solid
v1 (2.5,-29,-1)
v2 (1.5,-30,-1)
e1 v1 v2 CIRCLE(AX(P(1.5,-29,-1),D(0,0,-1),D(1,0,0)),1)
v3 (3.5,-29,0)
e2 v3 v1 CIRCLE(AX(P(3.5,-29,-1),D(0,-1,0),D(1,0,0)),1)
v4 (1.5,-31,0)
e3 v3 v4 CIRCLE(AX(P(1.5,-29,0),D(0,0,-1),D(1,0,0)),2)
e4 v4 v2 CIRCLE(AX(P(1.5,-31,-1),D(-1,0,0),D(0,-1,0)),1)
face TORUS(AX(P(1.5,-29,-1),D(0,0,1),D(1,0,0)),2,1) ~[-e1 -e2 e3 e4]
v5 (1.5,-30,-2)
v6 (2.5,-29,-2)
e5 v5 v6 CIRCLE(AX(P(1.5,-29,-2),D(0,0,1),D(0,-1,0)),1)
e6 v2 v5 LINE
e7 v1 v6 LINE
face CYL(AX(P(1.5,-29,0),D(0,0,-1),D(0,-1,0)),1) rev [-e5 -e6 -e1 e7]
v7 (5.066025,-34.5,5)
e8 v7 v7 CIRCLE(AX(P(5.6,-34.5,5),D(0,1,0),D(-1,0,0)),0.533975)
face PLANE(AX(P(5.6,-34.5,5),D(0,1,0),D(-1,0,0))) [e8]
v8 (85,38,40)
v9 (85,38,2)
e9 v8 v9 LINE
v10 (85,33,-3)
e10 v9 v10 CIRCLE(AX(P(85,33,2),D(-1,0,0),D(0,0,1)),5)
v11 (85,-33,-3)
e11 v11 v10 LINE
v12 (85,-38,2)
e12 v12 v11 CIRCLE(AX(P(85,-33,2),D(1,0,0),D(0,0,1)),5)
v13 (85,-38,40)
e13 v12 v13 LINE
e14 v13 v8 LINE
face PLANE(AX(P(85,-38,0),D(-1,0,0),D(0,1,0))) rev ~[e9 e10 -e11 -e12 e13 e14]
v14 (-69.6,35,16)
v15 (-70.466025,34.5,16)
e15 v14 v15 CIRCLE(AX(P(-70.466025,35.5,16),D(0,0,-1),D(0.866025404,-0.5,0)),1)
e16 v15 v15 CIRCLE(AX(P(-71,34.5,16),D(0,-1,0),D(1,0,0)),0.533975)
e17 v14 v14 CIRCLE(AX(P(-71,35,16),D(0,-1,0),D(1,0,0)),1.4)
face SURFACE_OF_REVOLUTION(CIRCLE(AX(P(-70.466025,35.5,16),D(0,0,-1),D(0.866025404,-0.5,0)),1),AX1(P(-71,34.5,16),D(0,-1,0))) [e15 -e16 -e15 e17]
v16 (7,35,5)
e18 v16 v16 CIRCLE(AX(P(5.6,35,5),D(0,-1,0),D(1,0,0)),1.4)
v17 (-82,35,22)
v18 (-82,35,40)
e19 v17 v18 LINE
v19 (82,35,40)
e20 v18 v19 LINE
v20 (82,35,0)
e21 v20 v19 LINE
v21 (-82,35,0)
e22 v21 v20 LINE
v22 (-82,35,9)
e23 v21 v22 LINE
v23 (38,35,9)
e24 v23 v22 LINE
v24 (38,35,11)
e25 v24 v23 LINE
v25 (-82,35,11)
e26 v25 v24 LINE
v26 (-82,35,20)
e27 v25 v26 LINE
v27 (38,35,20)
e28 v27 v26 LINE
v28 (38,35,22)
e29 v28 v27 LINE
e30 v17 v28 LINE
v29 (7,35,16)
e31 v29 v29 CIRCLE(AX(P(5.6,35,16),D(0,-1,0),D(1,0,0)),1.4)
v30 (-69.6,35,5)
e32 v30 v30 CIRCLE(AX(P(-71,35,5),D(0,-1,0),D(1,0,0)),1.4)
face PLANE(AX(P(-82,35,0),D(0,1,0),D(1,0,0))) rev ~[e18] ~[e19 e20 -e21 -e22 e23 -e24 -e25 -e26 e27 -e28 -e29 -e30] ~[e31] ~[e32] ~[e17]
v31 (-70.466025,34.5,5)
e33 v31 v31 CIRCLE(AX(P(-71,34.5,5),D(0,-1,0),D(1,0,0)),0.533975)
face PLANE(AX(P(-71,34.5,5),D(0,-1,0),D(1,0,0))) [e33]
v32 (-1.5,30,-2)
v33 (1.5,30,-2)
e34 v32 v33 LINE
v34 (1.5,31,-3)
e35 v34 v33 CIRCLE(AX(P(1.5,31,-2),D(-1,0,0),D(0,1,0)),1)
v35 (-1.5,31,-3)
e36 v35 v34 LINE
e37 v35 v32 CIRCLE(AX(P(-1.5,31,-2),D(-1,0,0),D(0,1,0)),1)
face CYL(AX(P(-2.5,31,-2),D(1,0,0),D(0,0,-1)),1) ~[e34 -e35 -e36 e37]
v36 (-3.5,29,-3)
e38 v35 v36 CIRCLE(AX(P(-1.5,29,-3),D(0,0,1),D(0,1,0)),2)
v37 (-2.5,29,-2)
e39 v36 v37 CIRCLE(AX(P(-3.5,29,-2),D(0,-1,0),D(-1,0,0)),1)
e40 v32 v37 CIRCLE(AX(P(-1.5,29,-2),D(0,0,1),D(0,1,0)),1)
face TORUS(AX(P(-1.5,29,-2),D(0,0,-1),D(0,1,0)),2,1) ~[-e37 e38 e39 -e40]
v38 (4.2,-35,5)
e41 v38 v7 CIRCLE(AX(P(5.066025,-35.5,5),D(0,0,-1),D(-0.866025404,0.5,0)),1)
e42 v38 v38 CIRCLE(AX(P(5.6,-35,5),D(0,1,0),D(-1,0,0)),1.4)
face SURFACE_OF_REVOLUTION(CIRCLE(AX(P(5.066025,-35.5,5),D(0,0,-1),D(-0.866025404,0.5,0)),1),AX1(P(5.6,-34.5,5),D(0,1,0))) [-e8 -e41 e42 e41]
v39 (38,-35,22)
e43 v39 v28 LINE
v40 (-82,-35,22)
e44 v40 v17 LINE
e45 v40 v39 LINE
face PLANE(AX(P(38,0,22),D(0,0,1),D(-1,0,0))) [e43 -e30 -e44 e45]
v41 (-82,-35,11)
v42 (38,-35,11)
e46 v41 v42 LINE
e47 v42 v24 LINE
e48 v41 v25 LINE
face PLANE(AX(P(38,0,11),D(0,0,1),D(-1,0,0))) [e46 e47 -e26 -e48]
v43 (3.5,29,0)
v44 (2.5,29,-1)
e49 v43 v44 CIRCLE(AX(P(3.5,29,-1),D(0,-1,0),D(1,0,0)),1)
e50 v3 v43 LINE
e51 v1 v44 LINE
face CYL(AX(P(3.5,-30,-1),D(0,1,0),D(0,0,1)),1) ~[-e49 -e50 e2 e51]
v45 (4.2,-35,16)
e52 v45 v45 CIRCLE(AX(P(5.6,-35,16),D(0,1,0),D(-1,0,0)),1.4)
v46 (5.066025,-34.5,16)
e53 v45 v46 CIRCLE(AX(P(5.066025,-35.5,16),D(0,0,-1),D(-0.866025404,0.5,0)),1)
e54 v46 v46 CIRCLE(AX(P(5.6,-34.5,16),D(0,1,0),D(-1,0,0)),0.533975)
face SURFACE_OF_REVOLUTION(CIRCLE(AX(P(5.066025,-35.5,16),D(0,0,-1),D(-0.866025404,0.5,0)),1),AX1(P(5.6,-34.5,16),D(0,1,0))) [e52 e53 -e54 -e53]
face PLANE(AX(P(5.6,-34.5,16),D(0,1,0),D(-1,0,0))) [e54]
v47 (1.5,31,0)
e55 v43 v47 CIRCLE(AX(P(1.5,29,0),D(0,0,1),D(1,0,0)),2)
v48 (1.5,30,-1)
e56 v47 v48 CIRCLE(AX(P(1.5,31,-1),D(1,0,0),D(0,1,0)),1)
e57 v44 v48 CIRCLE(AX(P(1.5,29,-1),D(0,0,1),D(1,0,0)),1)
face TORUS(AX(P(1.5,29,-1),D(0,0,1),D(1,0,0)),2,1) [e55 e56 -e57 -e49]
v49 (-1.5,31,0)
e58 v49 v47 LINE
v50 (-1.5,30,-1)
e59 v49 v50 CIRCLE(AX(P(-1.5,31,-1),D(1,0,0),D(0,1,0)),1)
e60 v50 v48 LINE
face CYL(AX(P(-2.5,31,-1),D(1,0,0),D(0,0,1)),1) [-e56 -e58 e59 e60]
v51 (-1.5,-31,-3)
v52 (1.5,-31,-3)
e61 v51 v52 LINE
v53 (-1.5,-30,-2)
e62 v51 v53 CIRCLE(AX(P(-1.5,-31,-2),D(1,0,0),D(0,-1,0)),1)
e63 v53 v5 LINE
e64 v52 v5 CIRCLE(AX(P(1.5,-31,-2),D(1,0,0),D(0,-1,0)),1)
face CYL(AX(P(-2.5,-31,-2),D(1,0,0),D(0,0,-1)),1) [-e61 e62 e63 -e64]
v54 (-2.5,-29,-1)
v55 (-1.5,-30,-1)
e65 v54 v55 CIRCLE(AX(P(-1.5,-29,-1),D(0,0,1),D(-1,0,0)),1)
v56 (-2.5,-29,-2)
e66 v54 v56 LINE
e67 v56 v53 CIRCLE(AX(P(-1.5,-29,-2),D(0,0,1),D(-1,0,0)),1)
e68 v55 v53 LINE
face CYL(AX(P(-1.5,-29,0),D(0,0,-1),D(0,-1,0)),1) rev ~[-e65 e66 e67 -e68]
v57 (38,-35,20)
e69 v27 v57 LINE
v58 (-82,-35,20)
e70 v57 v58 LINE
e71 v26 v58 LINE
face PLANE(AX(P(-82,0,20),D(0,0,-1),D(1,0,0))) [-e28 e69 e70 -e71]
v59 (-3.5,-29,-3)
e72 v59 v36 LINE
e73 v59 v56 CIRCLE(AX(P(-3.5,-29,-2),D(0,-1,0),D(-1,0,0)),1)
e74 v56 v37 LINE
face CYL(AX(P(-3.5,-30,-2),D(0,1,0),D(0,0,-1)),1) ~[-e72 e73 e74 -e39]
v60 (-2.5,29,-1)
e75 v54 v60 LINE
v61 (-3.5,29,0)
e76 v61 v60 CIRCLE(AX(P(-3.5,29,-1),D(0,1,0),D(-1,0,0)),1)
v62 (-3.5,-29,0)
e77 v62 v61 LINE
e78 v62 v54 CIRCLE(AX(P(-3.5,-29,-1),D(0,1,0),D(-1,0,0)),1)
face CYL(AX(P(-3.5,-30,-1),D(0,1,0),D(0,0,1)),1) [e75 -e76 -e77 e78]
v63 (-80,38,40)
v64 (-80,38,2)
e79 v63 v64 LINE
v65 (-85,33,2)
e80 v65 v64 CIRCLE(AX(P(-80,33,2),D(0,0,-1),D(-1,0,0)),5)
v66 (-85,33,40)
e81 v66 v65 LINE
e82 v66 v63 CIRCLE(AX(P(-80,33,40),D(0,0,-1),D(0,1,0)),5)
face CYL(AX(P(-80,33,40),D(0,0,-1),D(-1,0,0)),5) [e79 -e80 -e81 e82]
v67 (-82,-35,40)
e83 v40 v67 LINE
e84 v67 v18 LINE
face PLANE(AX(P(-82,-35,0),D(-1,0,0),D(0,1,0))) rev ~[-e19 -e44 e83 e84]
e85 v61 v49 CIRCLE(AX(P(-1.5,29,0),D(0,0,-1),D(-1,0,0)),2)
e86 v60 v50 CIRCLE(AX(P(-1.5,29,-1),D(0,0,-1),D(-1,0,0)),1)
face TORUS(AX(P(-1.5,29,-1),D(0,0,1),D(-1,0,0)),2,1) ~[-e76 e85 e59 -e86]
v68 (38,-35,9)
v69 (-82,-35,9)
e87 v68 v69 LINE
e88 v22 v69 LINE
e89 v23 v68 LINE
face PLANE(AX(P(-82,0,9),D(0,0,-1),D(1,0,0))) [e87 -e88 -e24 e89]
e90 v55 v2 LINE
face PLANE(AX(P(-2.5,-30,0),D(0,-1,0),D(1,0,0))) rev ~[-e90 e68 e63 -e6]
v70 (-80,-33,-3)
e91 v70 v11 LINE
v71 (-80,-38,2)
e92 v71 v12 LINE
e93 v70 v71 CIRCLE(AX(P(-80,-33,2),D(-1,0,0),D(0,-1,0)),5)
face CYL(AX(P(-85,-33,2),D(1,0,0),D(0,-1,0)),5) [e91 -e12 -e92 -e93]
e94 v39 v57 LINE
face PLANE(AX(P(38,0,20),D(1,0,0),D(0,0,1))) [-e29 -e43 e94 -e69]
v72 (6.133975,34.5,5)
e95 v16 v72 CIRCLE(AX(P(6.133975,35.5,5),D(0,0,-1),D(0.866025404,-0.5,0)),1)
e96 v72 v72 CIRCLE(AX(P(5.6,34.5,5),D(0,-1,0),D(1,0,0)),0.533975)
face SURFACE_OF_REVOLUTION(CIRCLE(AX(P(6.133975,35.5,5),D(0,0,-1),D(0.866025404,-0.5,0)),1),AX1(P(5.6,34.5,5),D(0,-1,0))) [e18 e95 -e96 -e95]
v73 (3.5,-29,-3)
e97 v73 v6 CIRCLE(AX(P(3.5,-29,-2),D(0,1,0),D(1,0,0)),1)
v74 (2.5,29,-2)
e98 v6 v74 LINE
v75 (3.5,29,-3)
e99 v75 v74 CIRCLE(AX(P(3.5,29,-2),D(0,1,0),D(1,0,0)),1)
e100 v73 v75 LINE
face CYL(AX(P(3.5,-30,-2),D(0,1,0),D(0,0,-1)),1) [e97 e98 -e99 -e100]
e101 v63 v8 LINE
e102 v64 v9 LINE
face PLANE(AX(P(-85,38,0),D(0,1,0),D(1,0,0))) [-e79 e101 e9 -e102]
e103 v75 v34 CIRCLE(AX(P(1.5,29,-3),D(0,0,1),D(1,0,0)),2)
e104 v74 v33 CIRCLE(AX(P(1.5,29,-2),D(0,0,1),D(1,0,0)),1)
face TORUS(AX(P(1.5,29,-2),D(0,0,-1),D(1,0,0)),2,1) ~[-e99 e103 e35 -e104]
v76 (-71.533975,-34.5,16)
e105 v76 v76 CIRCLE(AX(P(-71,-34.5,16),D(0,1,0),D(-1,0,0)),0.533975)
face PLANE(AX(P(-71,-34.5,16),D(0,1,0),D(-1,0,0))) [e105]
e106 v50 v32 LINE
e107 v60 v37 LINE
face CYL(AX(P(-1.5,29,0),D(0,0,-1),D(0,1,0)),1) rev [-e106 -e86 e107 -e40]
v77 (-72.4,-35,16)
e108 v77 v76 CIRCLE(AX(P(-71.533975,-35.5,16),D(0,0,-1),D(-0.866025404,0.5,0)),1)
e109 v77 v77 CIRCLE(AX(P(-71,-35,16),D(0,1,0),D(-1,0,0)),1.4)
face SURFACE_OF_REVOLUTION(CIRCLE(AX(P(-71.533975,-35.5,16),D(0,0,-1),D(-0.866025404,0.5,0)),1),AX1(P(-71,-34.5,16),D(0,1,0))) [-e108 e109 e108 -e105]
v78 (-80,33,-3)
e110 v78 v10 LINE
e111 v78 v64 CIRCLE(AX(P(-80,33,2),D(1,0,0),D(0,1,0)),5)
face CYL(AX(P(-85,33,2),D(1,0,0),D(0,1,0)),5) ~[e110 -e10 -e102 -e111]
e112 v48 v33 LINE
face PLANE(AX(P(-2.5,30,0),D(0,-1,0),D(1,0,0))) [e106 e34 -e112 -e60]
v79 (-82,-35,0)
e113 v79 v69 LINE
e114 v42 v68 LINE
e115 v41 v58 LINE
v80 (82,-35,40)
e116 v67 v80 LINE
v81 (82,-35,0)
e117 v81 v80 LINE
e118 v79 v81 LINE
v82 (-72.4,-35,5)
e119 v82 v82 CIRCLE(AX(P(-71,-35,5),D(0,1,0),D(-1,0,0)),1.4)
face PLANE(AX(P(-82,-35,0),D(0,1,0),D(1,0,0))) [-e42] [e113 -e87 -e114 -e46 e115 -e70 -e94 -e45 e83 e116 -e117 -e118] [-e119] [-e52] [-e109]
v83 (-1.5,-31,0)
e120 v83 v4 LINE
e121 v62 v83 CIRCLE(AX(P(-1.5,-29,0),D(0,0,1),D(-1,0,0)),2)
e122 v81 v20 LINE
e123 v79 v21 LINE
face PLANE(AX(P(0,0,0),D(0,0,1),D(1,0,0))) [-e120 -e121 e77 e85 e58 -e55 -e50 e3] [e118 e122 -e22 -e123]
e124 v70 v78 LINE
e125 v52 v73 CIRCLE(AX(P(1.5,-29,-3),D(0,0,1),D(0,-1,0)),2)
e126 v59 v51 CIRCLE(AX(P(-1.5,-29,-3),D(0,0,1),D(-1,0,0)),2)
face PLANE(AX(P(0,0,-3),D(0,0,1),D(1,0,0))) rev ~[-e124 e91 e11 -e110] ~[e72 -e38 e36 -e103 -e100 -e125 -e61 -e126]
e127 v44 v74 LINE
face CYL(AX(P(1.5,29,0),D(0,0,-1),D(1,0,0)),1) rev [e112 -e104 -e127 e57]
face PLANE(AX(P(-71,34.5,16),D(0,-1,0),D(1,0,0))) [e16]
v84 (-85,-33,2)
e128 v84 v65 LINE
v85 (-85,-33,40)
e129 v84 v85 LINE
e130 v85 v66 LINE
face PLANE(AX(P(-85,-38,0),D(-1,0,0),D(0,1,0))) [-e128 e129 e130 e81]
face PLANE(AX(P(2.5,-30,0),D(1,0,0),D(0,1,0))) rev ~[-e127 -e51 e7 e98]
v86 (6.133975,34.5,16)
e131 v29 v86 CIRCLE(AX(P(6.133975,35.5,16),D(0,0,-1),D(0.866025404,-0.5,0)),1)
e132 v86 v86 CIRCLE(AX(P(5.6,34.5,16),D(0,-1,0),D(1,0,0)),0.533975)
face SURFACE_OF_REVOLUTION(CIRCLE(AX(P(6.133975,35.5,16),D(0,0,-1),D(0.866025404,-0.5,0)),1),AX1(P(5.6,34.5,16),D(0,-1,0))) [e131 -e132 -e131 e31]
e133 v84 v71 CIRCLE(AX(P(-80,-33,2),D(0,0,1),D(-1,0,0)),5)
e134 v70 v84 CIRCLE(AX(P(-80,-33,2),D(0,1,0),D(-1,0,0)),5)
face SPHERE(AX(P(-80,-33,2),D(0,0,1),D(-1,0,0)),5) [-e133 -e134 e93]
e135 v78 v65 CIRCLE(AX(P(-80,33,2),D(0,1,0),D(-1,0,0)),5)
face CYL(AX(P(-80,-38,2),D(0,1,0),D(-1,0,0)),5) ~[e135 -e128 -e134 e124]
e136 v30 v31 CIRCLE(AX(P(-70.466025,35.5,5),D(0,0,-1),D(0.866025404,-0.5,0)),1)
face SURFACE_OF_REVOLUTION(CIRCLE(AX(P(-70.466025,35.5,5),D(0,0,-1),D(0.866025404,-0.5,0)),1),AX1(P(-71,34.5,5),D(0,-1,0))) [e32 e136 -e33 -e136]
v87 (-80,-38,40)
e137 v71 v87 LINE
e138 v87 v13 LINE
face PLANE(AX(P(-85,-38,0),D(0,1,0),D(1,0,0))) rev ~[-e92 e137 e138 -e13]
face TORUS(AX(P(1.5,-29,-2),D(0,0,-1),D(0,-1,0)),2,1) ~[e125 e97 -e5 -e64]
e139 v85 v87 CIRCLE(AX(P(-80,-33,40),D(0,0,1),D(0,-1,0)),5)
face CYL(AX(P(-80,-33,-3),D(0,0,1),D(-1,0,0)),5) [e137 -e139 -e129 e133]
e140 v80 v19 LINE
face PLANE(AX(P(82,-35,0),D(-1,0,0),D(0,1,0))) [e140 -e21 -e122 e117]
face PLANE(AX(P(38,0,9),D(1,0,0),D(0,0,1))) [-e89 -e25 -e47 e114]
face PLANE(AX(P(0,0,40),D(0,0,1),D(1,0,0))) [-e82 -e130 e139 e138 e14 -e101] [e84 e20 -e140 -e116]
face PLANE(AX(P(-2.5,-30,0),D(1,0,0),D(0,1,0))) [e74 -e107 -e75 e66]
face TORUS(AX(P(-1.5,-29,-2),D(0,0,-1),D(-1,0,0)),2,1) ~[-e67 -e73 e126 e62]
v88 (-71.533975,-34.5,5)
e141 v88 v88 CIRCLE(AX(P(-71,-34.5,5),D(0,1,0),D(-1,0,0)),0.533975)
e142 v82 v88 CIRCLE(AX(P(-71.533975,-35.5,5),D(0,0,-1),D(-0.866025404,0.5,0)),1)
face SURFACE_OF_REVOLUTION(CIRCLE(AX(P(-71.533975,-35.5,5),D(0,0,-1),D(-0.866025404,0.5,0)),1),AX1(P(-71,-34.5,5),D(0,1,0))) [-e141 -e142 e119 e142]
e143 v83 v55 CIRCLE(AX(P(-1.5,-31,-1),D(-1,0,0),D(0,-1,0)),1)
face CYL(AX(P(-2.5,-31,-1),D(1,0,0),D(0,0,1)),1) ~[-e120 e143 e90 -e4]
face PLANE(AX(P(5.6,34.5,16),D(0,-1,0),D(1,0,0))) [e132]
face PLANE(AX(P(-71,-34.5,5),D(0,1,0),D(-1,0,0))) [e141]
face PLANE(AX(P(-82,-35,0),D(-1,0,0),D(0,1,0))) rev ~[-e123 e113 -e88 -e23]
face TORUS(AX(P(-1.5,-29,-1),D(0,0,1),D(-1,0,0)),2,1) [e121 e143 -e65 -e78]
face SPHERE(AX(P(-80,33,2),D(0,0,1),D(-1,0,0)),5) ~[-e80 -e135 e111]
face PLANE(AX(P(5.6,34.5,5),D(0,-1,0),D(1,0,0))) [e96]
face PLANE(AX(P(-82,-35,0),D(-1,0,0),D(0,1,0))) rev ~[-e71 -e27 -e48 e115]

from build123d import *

# Parameters (mm, degrees)
F0_W      = 170
F0_H      = 76
F0_W_2    = 164
F0_H_2    = 70
F1_DEPTH  = 3
F2_DEPTH  = 40
F4_DEPTH  = 35.9
F5_DEPTH  = 36.4
F6_R      = 1.4
F7_DEPTH  = 0.5
F9_R      = 1.4
F10_DEPTH = 0.5
F12_R     = 5
F13_W     = 5
F13_H     = 60
F14_DEPTH = 5
F15_R     = 1


# Not quite as in the source:
# - a fillet or chamfer that OpenCascade refuses, or shapes differently, is made with other operations: its cross-section is extruded or revolved along the edge and cut away or added


with BuildPart() as f1:
    # F0 (on Top) → F1 (new body)
    with BuildSketch(Plane.XY):
        Rectangle(F0_W, F0_H)
        Rectangle(F0_W_2, F0_H_2, mode=Mode.SUBTRACT)
        Rectangle(F0_W_2, F0_H_2)
    extrude(amount=-F1_DEPTH)

    # F0 (on Top) → F2 (join)
    with BuildSketch(Plane.XY):
        Rectangle(F0_W, F0_H)
        Rectangle(F0_W_2, F0_H_2, mode=Mode.SUBTRACT)
    extrude(amount=F2_DEPTH)

    # F3 (on Front) → F4 (join, symmetric)
    with BuildSketch(Plane.XZ):
        Polygon((-82, 11), (-82, 9), (-71, 9), (0, 9), (5.6, 9), (38, 9), (38, 11), align=None)
    extrude(amount=F4_DEPTH, both=True)

    # F3 (on Front) → F5 (join, symmetric)
    with BuildSketch(Plane.XZ):
        Polygon((-82, 22), (-82, 20), (-71, 20), (5.6, 20), (38, 20), (38, 22), align=None)
    extrude(amount=F5_DEPTH, both=True)

    # F6 (on face) → F7 (join)
    with BuildSketch(Plane.XZ.offset(-35)):
        with Locations((-71, 16)):
            Circle(F6_R)
        with Locations((-71, 5)):
            Circle(F6_R)
        with Locations((5.6, 5)):
            Circle(F6_R)
        with Locations((5.6, 16)):
            Circle(F6_R)
    extrude(amount=F7_DEPTH)

    # F8: fillet of radius 1 on 4 edges, made by hand

    # F8_s1 → F8_t2 (revolve, cut)
    with BuildSketch(Plane.XY.offset(16)):
        with BuildLine():
            ThreePointArc((-69.6, 35), (-69.9660254038, 34.6339745962), (-70.4660254038, 34.5))
            Line((-70.4660254038, 34.5), (-69.6, 34.5))
            Line((-69.6, 34.5), (-69.6, 35))
        make_face()
    revolve(axis=Axis((-71, 34.5, 16), (0, -1, 0)), mode=Mode.SUBTRACT)

    # F8_s3 → F8_t4 (revolve, cut)
    with BuildSketch(Plane.XY.offset(5)):
        with BuildLine():
            ThreePointArc((-69.6, 35), (-69.9660254038, 34.6339745962), (-70.4660254038, 34.5))
            Line((-70.4660254038, 34.5), (-69.6, 34.5))
            Line((-69.6, 34.5), (-69.6, 35))
        make_face()
    revolve(axis=Axis((-71, 34.5, 5), (0, -1, 0)), mode=Mode.SUBTRACT)

    # F8_s5 → F8_t6 (revolve, cut)
    with BuildSketch(Plane.XY.offset(16)):
        with BuildLine():
            ThreePointArc((7, 35), (6.6339745962, 34.6339745962), (6.1339745962, 34.5))
            Line((6.1339745962, 34.5), (7, 34.5))
            Line((7, 34.5), (7, 35))
        make_face()
    revolve(axis=Axis((5.6, 34.5, 16), (0, -1, 0)), mode=Mode.SUBTRACT)

    # F8_s7 → F8_t8 (revolve, cut)
    with BuildSketch(Plane.XY.offset(5)):
        with BuildLine():
            ThreePointArc((7, 35), (6.6339745962, 34.6339745962), (6.1339745962, 34.5))
            Line((6.1339745962, 34.5), (7, 34.5))
            Line((7, 34.5), (7, 35))
        make_face()
    revolve(axis=Axis((5.6, 34.5, 5), (0, -1, 0)), mode=Mode.SUBTRACT)

    # F9 (on face) → F10 (join)
    with BuildSketch(Plane(origin=(0, -35, 0), x_dir=(-1, 0, 0), z_dir=(0, 1, 0))):
        with Locations((71, 16)):
            Circle(F9_R)
        with Locations((-5.6, 16)):
            Circle(F9_R)
        with Locations((-5.6, 5)):
            Circle(F9_R)
        with Locations((71, 5)):
            Circle(F9_R)
    extrude(amount=F10_DEPTH)

    # F11: fillet of radius 1 on 4 edges, made by hand

    # F11_s1 → F11_t2 (revolve, cut)
    with BuildSketch(Plane.XY.offset(16)):
        with BuildLine():
            ThreePointArc((-72.4, -35), (-72.0339745962, -34.6339745962), (-71.5339745962, -34.5))
            Line((-71.5339745962, -34.5), (-72.4, -34.5))
            Line((-72.4, -34.5), (-72.4, -35))
        make_face()
    revolve(axis=Axis((-71, -34.5, 16), (0, 1, 0)), mode=Mode.SUBTRACT)

    # F11_s3 → F11_t4 (revolve, cut)
    with BuildSketch(Plane.XY.offset(5)):
        with BuildLine():
            ThreePointArc((-72.4, -35), (-72.0339745962, -34.6339745962), (-71.5339745962, -34.5))
            Line((-71.5339745962, -34.5), (-72.4, -34.5))
            Line((-72.4, -34.5), (-72.4, -35))
        make_face()
    revolve(axis=Axis((-71, -34.5, 5), (0, 1, 0)), mode=Mode.SUBTRACT)

    # F11_s5 → F11_t6 (revolve, cut)
    with BuildSketch(Plane.XY.offset(16)):
        with BuildLine():
            ThreePointArc((4.2, -35), (4.5660254038, -34.6339745962), (5.0660254038, -34.5))
            Line((5.0660254038, -34.5), (4.2, -34.5))
            Line((4.2, -34.5), (4.2, -35))
        make_face()
    revolve(axis=Axis((5.6, -34.5, 16), (0, 1, 0)), mode=Mode.SUBTRACT)

    # F11_s7 → F11_t8 (revolve, cut)
    with BuildSketch(Plane.XY.offset(5)):
        with BuildLine():
            ThreePointArc((4.2, -35), (4.5660254038, -34.6339745962), (5.0660254038, -34.5))
            Line((5.0660254038, -34.5), (4.2, -34.5))
            Line((4.2, -34.5), (4.2, -35))
        make_face()
    revolve(axis=Axis((5.6, -34.5, 5), (0, 1, 0)), mode=Mode.SUBTRACT)

    # F12
    f12_edges = [f1.edges().sort_by_distance(p)[0] for p in [
        (-85, 38, 18.5),
        (-85, -38, 18.5),
        (-85, 0, -3),
        (0, 38, -3),
        (0, -38, -3),
    ]]
    fillet(f12_edges, radius=F12_R)

    # F13 (on face) → F14 (cut)
    with BuildSketch(Plane.XY):
        Rectangle(F13_W, F13_H)
    extrude(amount=-F14_DEPTH, mode=Mode.SUBTRACT)

    # F15
    f15_edges = [f1.edges().sort_by_distance(p)[0] for p in [
        (0, 30, 0),
        (-2.5, 30, -1.5),
        (0, 30, -3),
        (2.5, 30, -1.5),
        (0, -30, 0),
        (2.5, -30, -1.5),
        (0, -30, -3),
        (-2.5, -30, -1.5),
        (-2.5, 0, -3),
        (2.5, 0, -3),
        (-2.5, 0, 0),
        (2.5, 0, 0),
    ]]
    fillet(f15_edges, radius=F15_R)


solid = f1.part
